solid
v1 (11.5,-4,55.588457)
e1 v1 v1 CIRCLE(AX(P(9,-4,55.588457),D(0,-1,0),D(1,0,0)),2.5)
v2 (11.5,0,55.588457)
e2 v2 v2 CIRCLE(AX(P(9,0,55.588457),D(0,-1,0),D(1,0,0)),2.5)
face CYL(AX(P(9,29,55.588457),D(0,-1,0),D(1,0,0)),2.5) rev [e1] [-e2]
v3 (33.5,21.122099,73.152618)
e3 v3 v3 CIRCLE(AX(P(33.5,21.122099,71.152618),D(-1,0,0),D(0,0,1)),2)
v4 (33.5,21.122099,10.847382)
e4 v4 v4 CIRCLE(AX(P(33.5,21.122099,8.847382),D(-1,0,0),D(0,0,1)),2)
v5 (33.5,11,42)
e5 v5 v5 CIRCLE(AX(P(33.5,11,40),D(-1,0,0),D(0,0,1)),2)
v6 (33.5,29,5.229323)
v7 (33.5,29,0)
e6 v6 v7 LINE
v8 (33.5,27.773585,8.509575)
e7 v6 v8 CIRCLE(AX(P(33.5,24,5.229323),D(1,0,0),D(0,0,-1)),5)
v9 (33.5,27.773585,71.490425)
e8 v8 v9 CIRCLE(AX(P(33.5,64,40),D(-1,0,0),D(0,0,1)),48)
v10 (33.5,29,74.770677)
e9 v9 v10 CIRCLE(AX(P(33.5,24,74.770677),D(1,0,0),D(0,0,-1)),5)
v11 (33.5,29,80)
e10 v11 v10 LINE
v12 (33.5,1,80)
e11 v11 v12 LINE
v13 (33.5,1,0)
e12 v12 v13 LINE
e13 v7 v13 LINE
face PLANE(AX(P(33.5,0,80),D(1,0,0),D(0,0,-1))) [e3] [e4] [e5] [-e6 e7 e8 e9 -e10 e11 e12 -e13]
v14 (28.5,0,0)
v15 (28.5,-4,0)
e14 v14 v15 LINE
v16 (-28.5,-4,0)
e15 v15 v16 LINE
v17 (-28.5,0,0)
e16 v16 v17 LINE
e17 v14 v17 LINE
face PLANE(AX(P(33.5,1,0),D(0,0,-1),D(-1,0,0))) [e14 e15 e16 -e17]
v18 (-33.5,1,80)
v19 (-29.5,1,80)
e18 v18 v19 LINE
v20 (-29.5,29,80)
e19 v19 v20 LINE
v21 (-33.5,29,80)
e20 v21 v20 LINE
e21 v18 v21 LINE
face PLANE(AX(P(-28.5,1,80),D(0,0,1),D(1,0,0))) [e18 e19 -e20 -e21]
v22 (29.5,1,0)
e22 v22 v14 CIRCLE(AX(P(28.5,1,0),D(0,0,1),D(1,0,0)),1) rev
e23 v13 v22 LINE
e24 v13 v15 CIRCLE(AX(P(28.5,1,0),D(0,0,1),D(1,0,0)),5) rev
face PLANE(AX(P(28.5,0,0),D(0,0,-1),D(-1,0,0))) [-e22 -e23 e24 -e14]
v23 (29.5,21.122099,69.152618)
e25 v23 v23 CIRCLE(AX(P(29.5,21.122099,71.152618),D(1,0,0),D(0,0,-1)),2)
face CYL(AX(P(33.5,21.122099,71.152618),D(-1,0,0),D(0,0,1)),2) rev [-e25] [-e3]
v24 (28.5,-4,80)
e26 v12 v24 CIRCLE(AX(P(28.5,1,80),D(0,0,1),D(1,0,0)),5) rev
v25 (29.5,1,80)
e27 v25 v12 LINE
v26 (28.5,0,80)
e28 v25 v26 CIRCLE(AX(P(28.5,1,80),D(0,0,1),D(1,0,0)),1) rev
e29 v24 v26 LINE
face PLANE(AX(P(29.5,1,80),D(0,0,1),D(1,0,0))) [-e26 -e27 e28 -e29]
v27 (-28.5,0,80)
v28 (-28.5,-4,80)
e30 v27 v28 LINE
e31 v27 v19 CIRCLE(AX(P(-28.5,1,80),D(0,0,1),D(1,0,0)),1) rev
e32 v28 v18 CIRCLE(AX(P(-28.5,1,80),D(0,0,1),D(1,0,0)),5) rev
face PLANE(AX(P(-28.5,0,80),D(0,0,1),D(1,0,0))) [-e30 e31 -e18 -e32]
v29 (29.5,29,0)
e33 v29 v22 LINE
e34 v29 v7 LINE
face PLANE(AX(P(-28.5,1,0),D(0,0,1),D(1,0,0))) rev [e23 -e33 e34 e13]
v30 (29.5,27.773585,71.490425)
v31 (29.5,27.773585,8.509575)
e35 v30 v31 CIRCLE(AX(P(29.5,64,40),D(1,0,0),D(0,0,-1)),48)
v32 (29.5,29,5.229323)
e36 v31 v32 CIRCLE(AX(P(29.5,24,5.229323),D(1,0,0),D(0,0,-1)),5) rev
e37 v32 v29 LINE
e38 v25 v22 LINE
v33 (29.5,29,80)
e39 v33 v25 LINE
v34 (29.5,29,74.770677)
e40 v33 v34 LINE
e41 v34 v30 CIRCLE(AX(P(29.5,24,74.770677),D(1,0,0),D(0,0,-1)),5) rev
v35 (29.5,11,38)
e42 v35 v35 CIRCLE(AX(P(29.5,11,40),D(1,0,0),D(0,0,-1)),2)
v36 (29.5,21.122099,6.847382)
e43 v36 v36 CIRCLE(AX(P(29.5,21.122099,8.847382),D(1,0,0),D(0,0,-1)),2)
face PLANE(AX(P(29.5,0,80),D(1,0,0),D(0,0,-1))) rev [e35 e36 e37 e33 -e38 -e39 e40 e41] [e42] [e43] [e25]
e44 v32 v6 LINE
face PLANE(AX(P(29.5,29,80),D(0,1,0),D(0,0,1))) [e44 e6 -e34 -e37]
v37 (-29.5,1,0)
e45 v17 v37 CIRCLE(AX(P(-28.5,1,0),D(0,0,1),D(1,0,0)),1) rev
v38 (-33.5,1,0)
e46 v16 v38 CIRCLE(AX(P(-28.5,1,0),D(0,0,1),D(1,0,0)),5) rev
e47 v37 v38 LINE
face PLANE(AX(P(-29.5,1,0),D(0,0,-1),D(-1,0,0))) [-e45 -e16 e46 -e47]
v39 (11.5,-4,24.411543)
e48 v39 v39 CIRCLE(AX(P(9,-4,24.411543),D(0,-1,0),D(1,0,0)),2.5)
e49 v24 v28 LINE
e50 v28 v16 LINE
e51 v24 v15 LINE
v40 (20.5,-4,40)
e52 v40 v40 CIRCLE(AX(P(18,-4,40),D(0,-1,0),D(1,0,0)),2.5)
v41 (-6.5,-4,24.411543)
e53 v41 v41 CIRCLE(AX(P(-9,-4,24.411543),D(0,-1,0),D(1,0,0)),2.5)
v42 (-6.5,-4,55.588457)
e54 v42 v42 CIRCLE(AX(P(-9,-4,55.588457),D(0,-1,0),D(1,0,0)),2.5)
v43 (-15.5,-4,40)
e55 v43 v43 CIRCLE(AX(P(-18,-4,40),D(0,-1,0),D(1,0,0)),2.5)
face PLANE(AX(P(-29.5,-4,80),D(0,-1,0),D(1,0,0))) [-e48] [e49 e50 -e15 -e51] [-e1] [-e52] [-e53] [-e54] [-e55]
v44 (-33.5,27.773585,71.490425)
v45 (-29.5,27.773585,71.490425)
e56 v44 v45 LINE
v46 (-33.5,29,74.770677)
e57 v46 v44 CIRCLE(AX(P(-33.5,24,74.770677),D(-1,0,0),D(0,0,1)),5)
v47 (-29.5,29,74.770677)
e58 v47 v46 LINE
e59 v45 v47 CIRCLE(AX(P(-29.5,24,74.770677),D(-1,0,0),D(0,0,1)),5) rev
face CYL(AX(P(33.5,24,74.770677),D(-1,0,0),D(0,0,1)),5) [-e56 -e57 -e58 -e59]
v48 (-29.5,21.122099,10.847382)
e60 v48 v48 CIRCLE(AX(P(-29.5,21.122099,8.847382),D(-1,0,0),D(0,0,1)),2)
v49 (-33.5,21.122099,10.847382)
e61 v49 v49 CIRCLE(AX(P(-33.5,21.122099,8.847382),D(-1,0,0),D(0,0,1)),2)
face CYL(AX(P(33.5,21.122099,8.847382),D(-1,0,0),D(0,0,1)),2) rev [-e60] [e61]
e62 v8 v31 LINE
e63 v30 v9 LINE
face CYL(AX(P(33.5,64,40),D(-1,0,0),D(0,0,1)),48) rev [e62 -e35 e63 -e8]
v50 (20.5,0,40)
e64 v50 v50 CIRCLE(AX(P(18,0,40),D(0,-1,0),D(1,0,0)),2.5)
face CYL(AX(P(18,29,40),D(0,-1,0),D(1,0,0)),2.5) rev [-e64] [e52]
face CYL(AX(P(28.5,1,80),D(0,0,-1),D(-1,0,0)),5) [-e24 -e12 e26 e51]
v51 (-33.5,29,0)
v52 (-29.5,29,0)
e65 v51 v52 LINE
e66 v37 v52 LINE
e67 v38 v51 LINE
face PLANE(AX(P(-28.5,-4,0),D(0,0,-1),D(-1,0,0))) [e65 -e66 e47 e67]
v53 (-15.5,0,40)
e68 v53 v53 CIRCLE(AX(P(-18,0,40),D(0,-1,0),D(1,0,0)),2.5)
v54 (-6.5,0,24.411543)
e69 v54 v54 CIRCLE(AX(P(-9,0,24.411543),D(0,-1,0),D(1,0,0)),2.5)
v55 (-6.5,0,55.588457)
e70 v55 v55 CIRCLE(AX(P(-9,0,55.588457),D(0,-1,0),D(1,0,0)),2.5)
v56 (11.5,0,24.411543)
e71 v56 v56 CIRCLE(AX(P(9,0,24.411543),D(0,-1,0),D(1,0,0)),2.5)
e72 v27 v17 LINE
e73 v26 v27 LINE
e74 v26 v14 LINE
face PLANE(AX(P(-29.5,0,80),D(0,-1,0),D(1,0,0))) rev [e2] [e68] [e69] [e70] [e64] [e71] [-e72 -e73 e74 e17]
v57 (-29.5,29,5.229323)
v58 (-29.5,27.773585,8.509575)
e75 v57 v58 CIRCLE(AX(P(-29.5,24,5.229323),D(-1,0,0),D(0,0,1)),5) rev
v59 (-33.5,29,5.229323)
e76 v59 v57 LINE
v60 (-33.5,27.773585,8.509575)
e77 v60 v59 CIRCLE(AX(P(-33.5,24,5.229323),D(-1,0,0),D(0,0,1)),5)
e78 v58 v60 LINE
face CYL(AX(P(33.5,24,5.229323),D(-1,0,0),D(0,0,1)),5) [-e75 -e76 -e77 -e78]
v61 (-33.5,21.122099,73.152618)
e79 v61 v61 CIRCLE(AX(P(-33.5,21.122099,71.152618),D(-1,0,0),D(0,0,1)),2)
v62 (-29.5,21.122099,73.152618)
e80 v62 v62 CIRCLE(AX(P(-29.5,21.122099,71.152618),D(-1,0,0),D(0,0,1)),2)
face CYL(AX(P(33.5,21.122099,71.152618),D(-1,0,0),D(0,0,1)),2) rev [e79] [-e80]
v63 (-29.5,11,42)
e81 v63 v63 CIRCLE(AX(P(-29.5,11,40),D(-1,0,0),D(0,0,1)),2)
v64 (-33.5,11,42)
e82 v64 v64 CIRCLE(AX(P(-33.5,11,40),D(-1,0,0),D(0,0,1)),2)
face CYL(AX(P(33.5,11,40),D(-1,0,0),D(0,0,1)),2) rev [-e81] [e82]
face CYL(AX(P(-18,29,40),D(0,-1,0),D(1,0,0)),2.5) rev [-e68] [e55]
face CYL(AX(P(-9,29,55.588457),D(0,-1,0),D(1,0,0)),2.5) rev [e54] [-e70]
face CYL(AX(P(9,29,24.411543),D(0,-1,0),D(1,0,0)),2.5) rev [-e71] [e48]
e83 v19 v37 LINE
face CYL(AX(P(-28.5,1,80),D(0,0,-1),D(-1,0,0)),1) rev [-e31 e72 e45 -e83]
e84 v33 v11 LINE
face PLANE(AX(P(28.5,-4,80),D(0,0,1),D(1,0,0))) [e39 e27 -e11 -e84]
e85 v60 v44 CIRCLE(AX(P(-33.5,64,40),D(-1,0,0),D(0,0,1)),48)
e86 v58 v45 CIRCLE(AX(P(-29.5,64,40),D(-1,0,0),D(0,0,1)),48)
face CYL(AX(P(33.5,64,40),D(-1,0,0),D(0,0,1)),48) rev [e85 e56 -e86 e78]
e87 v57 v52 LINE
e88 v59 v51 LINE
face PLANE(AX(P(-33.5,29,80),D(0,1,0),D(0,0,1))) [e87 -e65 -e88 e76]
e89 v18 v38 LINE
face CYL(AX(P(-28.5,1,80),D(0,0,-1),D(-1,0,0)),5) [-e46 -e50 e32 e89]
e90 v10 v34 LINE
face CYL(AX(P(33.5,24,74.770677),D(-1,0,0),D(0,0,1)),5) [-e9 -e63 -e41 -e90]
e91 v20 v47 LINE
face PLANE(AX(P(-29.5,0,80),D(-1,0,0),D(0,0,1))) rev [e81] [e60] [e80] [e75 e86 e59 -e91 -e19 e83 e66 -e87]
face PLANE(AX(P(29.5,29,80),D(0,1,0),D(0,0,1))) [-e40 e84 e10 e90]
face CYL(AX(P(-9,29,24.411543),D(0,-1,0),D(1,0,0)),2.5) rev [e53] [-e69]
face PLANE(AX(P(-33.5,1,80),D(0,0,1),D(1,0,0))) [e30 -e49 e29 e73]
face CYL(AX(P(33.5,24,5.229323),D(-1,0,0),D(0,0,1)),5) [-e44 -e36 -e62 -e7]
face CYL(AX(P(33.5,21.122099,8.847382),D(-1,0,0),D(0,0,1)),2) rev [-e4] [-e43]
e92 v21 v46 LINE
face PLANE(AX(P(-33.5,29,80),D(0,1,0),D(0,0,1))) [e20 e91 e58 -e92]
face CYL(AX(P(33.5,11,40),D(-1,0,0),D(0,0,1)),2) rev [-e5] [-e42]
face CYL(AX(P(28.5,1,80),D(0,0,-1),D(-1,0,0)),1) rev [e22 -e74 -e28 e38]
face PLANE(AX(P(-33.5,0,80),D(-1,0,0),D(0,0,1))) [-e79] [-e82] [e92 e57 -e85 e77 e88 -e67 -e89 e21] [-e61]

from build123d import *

# Parameters (mm, degrees)
SM_BASE_FLANGE_1_DEPTH   = 80
CUT_EXTRUDE_3_DEPTH      = 109.305124532
CUT_EXTRUDE_3_DEPTH_BACK = 109.305124532
SKETCH_6_R               = 48
SKETCH_6_R_2             = 2
FILLET_1_R               = 5
SKETCH_9_R               = 2.5
CUT_EXTRUDE_4_DEPTH      = 93.796821066


# Sheet-metal steps are written as plain solids
with BuildPart() as part:
    # Sketch 1 → Базовая кромка1 (new body)
    with BuildSketch(Plane.XY):
        with BuildLine():
            Line((-29.5, 29), (-29.5, 1))
            ThreePointArc((-29.5, 1), (-29.207106781, 0.292893219), (-28.5, 0))
            Line((-28.5, 0), (28.5, 0))
            ThreePointArc((28.5, 0), (29.207106781, 0.292893219), (29.5, 1))
            Line((29.5, 1), (29.5, 29))
            Line((29.5, 29), (33.5, 29))
            Line((33.5, 29), (33.5, 1))
            ThreePointArc((33.5, 1), (32.035533906, -2.535533906), (28.5, -4))
            Line((28.5, -4), (-28.5, -4))
            ThreePointArc((-28.5, -4), (-32.035533906, -2.535533906), (-33.5, 1))
            Line((-33.5, 1), (-33.5, 29))
            Line((-33.5, 29), (-29.5, 29))
        make_face()
    extrude(amount=SM_BASE_FLANGE_1_DEPTH)

    # Эскиз6 → Вырез-Вытянуть3 (cut, two sides: drawn at the far end of the back side and taken through both)
    with BuildSketch(Plane.ZY.offset(33.5).offset(-CUT_EXTRUDE_3_DEPTH_BACK)):
        with Locations((40, 64)):
            Circle(SKETCH_6_R)
        with Locations((40, 11)):
            Circle(SKETCH_6_R_2)
        with Locations((8.847381628, 21.122099298)):
            Circle(SKETCH_6_R_2)
        with Locations((71.152618372, 21.122099298)):
            Circle(SKETCH_6_R_2)
    extrude(amount=CUT_EXTRUDE_3_DEPTH + CUT_EXTRUDE_3_DEPTH_BACK, mode=Mode.SUBTRACT)

    # Скругление1
    fillet_1_edges = [part.edges().sort_by_distance(p)[0] for p in [
        (31.5, 29, 7.151864589),
        (31.5, 29, 72.848135411),
        (-31.5, 29, 7.151864589),
        (-31.5, 29, 72.848135411),
    ]]
    fillet(fillet_1_edges, radius=FILLET_1_R)

    # Эскиз9 → Вырез-Вытянуть4 (cut, through all)
    with BuildSketch(Plane.XZ.offset(4)):
        with Locations((18, 40)):
            Circle(SKETCH_9_R)
        with Locations((9, 24.411542732)):
            Circle(SKETCH_9_R)
        with Locations((-9, 24.411542732)):
            Circle(SKETCH_9_R)
        with Locations((-18, 40)):
            Circle(SKETCH_9_R)
        with Locations((-9, 55.588457268)):
            Circle(SKETCH_9_R)
        with Locations((9, 55.588457268)):
            Circle(SKETCH_9_R)
    extrude(amount=-CUT_EXTRUDE_4_DEPTH, mode=Mode.SUBTRACT)


solid = part.part
